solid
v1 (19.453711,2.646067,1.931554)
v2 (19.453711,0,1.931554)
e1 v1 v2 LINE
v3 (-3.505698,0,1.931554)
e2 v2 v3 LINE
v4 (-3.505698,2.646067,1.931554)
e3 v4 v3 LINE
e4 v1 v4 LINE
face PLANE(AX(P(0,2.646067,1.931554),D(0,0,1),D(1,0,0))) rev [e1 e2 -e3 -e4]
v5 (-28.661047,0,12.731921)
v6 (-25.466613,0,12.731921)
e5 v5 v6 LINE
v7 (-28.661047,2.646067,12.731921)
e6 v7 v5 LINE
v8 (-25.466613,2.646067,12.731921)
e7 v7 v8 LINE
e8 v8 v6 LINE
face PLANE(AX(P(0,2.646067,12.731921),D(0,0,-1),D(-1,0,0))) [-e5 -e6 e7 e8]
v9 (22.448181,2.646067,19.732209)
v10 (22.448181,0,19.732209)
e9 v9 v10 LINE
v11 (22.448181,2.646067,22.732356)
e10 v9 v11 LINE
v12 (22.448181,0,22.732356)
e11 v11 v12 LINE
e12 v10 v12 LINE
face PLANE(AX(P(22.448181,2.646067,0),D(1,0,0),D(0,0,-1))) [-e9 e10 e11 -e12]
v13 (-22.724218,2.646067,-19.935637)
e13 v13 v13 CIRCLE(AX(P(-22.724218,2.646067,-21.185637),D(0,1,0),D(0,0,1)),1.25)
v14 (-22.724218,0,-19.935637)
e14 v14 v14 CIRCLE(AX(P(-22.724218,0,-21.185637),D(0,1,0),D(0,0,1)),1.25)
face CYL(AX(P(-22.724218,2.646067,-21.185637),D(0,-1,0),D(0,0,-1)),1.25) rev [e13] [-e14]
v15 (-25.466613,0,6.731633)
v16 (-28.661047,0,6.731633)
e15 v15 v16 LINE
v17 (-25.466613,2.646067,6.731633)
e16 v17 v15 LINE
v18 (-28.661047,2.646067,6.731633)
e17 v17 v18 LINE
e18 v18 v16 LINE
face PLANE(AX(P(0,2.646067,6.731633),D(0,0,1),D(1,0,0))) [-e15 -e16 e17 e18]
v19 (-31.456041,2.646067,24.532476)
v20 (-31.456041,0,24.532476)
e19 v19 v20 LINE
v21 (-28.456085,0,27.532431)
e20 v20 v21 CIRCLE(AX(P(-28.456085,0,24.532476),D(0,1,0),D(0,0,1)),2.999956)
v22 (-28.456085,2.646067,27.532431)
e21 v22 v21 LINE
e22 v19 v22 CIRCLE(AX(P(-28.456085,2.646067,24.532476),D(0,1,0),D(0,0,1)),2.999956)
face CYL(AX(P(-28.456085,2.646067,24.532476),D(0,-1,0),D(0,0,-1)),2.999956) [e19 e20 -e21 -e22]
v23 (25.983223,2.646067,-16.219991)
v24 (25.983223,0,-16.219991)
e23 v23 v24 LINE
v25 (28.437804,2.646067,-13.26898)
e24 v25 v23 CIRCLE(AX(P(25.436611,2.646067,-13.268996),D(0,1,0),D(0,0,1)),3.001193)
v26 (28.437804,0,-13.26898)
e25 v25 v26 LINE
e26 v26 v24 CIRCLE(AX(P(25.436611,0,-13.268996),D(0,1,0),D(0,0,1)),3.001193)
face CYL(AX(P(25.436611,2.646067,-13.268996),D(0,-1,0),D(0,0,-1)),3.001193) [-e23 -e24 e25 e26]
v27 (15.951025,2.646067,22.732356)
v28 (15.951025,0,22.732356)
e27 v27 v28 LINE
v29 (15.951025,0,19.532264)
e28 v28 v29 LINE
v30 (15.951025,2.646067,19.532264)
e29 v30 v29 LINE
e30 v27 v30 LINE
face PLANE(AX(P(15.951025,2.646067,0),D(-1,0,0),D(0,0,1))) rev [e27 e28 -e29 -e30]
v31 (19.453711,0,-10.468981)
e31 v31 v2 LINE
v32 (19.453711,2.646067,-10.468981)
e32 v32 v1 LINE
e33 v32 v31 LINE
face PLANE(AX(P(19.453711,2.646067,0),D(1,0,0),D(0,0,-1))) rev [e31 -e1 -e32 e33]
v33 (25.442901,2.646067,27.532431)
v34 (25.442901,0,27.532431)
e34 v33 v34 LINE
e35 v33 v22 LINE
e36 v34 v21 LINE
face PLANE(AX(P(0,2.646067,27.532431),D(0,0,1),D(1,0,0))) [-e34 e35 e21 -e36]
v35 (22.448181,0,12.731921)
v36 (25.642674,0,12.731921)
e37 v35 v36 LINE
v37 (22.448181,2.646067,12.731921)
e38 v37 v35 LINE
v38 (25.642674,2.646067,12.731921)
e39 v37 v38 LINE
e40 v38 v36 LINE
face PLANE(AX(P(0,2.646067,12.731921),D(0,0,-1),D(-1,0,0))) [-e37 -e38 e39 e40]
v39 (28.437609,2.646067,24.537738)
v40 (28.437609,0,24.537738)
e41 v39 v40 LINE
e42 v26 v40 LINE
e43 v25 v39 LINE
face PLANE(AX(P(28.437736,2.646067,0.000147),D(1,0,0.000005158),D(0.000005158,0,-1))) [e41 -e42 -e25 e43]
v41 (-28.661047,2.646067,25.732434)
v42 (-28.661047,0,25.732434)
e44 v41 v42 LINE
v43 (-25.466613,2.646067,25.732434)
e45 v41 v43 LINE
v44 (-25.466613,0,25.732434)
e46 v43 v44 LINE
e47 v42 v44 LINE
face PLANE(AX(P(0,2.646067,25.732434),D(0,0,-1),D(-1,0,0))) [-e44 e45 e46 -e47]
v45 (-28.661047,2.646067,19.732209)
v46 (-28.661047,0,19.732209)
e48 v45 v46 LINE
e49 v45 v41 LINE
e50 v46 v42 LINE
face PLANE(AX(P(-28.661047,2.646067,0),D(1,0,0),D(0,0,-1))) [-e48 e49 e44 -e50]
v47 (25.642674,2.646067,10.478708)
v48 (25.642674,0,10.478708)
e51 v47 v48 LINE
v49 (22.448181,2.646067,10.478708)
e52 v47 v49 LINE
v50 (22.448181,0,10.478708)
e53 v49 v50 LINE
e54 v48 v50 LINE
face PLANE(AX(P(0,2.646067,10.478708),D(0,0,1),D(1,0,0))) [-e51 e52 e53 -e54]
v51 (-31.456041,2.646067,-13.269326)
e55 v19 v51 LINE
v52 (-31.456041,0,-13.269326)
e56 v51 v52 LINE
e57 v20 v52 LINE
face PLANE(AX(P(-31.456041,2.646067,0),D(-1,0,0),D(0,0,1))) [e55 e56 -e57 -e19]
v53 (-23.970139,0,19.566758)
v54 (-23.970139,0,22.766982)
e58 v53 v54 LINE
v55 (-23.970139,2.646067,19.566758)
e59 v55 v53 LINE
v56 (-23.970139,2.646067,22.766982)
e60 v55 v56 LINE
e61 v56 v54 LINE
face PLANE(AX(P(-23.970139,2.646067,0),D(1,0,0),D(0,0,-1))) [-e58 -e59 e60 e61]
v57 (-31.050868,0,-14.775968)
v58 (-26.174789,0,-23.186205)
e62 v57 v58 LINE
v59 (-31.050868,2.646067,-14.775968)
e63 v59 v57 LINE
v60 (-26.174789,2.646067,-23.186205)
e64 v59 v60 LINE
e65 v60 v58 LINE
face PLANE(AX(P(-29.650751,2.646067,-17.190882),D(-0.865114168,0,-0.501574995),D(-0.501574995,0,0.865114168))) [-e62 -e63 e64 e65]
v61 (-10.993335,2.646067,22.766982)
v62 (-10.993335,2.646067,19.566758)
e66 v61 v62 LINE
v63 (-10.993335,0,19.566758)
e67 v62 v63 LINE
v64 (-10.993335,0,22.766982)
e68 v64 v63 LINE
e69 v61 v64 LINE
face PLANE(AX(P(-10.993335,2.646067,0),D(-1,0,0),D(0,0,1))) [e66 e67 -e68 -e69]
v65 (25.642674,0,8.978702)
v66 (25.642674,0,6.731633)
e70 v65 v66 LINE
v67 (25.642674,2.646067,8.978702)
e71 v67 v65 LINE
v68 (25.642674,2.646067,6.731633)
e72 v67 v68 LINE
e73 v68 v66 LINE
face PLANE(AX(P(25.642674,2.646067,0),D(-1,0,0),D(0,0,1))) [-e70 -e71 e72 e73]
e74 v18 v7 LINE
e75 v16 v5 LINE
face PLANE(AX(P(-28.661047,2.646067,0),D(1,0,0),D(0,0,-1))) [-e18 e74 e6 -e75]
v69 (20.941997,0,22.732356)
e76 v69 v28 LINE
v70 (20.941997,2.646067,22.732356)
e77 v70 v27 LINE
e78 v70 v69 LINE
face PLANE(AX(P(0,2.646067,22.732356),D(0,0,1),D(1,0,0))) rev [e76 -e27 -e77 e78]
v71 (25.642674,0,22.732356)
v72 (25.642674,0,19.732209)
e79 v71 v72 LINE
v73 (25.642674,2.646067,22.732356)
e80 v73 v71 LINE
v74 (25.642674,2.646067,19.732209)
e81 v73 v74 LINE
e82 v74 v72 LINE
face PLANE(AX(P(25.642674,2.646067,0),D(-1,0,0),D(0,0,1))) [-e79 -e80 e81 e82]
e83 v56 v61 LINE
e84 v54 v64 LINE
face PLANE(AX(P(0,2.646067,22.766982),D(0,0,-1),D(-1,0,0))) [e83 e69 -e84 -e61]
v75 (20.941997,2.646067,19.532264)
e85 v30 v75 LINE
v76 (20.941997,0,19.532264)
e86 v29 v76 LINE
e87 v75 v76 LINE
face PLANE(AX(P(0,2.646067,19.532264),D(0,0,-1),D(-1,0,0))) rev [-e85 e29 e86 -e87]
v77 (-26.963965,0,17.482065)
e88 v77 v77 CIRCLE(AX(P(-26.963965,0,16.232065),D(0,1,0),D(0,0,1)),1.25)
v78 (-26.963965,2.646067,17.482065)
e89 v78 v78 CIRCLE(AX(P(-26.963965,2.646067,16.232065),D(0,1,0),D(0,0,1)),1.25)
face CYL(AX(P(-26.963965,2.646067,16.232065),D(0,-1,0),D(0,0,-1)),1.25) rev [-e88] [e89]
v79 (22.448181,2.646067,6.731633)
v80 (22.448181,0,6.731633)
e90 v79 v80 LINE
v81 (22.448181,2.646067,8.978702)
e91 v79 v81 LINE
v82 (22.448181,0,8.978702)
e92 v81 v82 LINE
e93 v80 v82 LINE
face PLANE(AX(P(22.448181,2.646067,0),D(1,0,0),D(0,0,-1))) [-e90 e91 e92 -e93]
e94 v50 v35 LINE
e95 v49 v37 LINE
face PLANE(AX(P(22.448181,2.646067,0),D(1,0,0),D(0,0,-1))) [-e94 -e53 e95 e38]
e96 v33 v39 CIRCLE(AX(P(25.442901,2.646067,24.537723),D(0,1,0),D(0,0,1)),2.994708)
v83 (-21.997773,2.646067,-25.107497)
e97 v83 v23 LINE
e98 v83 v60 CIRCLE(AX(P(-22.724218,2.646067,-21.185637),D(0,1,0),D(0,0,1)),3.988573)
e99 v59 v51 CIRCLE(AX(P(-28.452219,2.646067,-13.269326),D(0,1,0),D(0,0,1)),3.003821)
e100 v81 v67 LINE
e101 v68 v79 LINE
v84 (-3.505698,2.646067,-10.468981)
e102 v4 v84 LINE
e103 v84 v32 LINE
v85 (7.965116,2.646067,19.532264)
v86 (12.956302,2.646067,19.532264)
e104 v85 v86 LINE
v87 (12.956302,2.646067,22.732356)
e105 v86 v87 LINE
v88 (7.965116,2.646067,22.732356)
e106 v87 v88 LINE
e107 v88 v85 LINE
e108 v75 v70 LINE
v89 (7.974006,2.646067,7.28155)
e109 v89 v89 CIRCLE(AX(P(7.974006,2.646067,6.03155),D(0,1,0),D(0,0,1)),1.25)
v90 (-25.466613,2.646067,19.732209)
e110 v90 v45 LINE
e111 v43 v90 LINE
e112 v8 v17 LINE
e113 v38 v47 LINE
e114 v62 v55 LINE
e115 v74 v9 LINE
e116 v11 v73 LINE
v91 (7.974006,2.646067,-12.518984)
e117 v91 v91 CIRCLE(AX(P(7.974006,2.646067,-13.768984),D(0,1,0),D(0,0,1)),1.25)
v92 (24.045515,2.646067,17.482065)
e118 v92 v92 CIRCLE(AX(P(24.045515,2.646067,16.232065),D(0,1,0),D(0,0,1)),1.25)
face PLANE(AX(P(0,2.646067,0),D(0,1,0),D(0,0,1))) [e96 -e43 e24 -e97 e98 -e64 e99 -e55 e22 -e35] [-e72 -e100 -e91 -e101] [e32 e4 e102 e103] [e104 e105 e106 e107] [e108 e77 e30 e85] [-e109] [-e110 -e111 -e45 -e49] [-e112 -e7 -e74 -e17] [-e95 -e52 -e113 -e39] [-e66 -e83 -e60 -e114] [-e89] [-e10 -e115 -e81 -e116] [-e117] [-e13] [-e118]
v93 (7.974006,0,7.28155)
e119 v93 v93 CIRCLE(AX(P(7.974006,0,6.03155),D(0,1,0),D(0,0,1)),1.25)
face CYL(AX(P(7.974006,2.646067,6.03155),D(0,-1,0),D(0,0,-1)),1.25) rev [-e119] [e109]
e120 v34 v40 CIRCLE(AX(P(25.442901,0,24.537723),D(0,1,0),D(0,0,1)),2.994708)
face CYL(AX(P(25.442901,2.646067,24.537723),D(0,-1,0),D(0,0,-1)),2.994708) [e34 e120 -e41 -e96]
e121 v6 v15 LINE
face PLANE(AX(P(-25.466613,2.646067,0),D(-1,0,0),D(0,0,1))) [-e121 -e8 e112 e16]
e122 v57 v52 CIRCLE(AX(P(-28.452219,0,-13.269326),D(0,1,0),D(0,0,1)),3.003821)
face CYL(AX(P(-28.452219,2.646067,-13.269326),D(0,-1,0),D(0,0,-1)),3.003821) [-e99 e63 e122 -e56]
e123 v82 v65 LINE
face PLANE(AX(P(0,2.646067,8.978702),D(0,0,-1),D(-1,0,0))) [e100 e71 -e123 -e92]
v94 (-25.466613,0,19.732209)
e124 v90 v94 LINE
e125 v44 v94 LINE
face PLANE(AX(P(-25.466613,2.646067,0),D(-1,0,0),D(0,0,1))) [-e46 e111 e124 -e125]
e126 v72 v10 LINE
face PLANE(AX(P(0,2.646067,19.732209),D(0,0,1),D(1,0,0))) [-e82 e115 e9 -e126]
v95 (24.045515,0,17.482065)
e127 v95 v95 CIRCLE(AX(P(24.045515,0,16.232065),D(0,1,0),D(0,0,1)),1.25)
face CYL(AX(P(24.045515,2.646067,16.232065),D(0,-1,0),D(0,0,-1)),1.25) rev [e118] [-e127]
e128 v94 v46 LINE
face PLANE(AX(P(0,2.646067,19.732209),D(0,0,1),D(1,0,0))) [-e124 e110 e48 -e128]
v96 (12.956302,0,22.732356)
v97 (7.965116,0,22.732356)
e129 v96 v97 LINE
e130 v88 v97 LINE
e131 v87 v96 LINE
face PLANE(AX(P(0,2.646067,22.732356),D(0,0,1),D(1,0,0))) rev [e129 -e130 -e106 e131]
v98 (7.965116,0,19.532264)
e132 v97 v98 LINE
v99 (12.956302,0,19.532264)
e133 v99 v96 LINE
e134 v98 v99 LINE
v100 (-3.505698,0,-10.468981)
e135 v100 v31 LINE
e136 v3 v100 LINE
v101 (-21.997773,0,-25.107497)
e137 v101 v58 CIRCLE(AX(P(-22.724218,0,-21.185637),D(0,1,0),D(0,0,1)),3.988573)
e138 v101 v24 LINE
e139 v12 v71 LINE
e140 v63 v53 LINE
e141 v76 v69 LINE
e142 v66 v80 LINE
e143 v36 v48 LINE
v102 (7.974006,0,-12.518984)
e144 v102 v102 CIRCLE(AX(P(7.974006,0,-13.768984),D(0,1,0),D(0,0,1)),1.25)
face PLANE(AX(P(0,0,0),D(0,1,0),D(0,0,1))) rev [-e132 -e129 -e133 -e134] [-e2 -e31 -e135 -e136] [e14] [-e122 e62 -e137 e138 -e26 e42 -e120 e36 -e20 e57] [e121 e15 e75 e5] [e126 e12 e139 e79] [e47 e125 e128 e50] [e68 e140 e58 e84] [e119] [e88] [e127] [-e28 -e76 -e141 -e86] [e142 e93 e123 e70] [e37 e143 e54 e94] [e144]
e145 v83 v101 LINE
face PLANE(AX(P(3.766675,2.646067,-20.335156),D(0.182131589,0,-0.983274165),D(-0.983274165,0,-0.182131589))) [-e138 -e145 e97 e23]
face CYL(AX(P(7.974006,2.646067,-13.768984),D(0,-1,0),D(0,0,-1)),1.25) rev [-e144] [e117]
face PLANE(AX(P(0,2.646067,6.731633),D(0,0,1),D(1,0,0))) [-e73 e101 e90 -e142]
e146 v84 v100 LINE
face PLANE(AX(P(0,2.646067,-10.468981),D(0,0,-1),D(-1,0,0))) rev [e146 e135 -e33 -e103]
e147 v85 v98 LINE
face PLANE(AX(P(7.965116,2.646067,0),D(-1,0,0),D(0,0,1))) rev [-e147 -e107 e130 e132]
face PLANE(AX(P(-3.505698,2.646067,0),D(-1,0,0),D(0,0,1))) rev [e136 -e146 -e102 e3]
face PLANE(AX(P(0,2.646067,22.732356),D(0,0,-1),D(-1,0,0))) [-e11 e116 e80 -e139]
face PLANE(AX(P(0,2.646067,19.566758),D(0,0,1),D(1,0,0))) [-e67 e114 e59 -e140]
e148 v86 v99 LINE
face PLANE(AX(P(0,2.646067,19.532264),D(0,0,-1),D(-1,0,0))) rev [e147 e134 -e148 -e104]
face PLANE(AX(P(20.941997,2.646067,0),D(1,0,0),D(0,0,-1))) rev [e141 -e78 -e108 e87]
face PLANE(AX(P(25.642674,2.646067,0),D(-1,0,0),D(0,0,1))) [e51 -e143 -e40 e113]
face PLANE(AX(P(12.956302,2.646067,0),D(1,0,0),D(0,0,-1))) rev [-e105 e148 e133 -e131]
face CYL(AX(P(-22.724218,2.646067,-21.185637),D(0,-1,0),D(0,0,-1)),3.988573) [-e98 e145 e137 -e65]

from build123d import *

# Parameters (mm, degrees)
SKETCH1_W           = 3.194434014
SKETCH1_H           = 6.000224533
SKETCH1_W_2         = 12.976803263
SKETCH1_H_2         = 3.200223762
SKETCH1_R           = 1.25
SKETCH1_H_3         = 6.000288014
SKETCH1_W_3         = 4.991186163
SKETCH1_H_4         = 3.200091917
SKETCH1_W_4         = 4.990971694
SKETCH1_W_5         = 3.194492506
SKETCH1_H_5         = 3.000146449
SKETCH1_H_6         = 2.247069465
SKETCH1_W_6         = 22.959409558
SKETCH1_H_7         = 12.40053533
BOSS_EXTRUDE1_DEPTH = 2.646066576


with BuildPart() as part:
    # Sketch1 → Boss-Extrude1 (new body)
    with BuildSketch(Plane(origin=(0, 0, 0), x_dir=(1, 0, 0), z_dir=(0, 1, 0))):
        with BuildLine():
            Line((-28.456084878, -27.532431428), (25.442900716, -27.532431428))
            ThreePointArc((25.442900716, -27.532431428), (27.560473935, -26.65530708), (28.437609204, -24.537738386))
            Line((28.437609204, -24.537738386), (28.437804204, 13.268980227))
            ThreePointArc((28.437804204, 13.268980227), (27.743957441, 15.188191581), (25.983223234, 16.219991273))
            Line((25.983223234, 16.219991273), (-21.997773241, 25.107497345))
            ThreePointArc((-21.997773241, 25.107497345), (-24.390968499, 24.809261571), (-26.174789125, 23.186205164))
            Line((-26.174789125, 23.186205164), (-31.050867612, 14.775968165))
            ThreePointArc((-31.050867612, 14.775968165), (-31.352979308, 14.049412081), (-31.456040564, 13.269326446))
            Line((-31.456040564, 13.269326446), (-31.456040564, -24.532475742))
            ThreePointArc((-31.456040564, -24.532475742), (-30.577373887, -26.653764751), (-28.456084878, -27.532431428))
        make_face()
        with Locations((-27.063830276, -22.732321631)):
            Rectangle(SKETCH1_W, SKETCH1_H, mode=Mode.SUBTRACT)
        with Locations((-17.481737065, -21.16687035)):
            Rectangle(SKETCH1_W_2, SKETCH1_H_2, mode=Mode.SUBTRACT)
        with Locations((-26.963965218, -16.232064957)):
            Circle(SKETCH1_R, mode=Mode.SUBTRACT)
        with Locations((-27.063830275, -9.731776544)):
            Rectangle(SKETCH1_W, SKETCH1_H_3, mode=Mode.SUBTRACT)
        with Locations((10.460708795, -21.132309856)):
            Rectangle(SKETCH1_W_3, SKETCH1_H_4, mode=Mode.SUBTRACT)
        with Locations((18.446511119, -21.132309856)):
            Rectangle(SKETCH1_W_4, SKETCH1_H_4, mode=Mode.SUBTRACT)
        with Locations((24.045427435, -21.232282591)):
            Rectangle(SKETCH1_W_5, SKETCH1_H_5, mode=Mode.SUBTRACT)
        with Locations((24.045515173, -16.23206496)):
            Circle(SKETCH1_R, mode=Mode.SUBTRACT)
        with Locations((7.974006472, -6.031549942)):
            Circle(SKETCH1_R, mode=Mode.SUBTRACT)
        Polygon((22.448181182, -10.484914569), (22.448181182, -10.478708085), (25.642673688, -10.478708085), (25.642673688, -12.731920553), (22.448181182, -12.731920553), align=None, mode=Mode.SUBTRACT)
        with Locations((24.045427436, -7.855167272)):
            Rectangle(SKETCH1_W_5, SKETCH1_H_6, mode=Mode.SUBTRACT)
        with Locations((-22.724218332, 21.185636807)):
            Circle(SKETCH1_R, mode=Mode.SUBTRACT)
        with Locations((7.974006472, 4.268713184)):
            Rectangle(SKETCH1_W_6, SKETCH1_H_7, mode=Mode.SUBTRACT)
        with Locations((7.974006473, 13.76898446)):
            Circle(SKETCH1_R, mode=Mode.SUBTRACT)
    extrude(amount=BOSS_EXTRUDE1_DEPTH)


solid = part.part
